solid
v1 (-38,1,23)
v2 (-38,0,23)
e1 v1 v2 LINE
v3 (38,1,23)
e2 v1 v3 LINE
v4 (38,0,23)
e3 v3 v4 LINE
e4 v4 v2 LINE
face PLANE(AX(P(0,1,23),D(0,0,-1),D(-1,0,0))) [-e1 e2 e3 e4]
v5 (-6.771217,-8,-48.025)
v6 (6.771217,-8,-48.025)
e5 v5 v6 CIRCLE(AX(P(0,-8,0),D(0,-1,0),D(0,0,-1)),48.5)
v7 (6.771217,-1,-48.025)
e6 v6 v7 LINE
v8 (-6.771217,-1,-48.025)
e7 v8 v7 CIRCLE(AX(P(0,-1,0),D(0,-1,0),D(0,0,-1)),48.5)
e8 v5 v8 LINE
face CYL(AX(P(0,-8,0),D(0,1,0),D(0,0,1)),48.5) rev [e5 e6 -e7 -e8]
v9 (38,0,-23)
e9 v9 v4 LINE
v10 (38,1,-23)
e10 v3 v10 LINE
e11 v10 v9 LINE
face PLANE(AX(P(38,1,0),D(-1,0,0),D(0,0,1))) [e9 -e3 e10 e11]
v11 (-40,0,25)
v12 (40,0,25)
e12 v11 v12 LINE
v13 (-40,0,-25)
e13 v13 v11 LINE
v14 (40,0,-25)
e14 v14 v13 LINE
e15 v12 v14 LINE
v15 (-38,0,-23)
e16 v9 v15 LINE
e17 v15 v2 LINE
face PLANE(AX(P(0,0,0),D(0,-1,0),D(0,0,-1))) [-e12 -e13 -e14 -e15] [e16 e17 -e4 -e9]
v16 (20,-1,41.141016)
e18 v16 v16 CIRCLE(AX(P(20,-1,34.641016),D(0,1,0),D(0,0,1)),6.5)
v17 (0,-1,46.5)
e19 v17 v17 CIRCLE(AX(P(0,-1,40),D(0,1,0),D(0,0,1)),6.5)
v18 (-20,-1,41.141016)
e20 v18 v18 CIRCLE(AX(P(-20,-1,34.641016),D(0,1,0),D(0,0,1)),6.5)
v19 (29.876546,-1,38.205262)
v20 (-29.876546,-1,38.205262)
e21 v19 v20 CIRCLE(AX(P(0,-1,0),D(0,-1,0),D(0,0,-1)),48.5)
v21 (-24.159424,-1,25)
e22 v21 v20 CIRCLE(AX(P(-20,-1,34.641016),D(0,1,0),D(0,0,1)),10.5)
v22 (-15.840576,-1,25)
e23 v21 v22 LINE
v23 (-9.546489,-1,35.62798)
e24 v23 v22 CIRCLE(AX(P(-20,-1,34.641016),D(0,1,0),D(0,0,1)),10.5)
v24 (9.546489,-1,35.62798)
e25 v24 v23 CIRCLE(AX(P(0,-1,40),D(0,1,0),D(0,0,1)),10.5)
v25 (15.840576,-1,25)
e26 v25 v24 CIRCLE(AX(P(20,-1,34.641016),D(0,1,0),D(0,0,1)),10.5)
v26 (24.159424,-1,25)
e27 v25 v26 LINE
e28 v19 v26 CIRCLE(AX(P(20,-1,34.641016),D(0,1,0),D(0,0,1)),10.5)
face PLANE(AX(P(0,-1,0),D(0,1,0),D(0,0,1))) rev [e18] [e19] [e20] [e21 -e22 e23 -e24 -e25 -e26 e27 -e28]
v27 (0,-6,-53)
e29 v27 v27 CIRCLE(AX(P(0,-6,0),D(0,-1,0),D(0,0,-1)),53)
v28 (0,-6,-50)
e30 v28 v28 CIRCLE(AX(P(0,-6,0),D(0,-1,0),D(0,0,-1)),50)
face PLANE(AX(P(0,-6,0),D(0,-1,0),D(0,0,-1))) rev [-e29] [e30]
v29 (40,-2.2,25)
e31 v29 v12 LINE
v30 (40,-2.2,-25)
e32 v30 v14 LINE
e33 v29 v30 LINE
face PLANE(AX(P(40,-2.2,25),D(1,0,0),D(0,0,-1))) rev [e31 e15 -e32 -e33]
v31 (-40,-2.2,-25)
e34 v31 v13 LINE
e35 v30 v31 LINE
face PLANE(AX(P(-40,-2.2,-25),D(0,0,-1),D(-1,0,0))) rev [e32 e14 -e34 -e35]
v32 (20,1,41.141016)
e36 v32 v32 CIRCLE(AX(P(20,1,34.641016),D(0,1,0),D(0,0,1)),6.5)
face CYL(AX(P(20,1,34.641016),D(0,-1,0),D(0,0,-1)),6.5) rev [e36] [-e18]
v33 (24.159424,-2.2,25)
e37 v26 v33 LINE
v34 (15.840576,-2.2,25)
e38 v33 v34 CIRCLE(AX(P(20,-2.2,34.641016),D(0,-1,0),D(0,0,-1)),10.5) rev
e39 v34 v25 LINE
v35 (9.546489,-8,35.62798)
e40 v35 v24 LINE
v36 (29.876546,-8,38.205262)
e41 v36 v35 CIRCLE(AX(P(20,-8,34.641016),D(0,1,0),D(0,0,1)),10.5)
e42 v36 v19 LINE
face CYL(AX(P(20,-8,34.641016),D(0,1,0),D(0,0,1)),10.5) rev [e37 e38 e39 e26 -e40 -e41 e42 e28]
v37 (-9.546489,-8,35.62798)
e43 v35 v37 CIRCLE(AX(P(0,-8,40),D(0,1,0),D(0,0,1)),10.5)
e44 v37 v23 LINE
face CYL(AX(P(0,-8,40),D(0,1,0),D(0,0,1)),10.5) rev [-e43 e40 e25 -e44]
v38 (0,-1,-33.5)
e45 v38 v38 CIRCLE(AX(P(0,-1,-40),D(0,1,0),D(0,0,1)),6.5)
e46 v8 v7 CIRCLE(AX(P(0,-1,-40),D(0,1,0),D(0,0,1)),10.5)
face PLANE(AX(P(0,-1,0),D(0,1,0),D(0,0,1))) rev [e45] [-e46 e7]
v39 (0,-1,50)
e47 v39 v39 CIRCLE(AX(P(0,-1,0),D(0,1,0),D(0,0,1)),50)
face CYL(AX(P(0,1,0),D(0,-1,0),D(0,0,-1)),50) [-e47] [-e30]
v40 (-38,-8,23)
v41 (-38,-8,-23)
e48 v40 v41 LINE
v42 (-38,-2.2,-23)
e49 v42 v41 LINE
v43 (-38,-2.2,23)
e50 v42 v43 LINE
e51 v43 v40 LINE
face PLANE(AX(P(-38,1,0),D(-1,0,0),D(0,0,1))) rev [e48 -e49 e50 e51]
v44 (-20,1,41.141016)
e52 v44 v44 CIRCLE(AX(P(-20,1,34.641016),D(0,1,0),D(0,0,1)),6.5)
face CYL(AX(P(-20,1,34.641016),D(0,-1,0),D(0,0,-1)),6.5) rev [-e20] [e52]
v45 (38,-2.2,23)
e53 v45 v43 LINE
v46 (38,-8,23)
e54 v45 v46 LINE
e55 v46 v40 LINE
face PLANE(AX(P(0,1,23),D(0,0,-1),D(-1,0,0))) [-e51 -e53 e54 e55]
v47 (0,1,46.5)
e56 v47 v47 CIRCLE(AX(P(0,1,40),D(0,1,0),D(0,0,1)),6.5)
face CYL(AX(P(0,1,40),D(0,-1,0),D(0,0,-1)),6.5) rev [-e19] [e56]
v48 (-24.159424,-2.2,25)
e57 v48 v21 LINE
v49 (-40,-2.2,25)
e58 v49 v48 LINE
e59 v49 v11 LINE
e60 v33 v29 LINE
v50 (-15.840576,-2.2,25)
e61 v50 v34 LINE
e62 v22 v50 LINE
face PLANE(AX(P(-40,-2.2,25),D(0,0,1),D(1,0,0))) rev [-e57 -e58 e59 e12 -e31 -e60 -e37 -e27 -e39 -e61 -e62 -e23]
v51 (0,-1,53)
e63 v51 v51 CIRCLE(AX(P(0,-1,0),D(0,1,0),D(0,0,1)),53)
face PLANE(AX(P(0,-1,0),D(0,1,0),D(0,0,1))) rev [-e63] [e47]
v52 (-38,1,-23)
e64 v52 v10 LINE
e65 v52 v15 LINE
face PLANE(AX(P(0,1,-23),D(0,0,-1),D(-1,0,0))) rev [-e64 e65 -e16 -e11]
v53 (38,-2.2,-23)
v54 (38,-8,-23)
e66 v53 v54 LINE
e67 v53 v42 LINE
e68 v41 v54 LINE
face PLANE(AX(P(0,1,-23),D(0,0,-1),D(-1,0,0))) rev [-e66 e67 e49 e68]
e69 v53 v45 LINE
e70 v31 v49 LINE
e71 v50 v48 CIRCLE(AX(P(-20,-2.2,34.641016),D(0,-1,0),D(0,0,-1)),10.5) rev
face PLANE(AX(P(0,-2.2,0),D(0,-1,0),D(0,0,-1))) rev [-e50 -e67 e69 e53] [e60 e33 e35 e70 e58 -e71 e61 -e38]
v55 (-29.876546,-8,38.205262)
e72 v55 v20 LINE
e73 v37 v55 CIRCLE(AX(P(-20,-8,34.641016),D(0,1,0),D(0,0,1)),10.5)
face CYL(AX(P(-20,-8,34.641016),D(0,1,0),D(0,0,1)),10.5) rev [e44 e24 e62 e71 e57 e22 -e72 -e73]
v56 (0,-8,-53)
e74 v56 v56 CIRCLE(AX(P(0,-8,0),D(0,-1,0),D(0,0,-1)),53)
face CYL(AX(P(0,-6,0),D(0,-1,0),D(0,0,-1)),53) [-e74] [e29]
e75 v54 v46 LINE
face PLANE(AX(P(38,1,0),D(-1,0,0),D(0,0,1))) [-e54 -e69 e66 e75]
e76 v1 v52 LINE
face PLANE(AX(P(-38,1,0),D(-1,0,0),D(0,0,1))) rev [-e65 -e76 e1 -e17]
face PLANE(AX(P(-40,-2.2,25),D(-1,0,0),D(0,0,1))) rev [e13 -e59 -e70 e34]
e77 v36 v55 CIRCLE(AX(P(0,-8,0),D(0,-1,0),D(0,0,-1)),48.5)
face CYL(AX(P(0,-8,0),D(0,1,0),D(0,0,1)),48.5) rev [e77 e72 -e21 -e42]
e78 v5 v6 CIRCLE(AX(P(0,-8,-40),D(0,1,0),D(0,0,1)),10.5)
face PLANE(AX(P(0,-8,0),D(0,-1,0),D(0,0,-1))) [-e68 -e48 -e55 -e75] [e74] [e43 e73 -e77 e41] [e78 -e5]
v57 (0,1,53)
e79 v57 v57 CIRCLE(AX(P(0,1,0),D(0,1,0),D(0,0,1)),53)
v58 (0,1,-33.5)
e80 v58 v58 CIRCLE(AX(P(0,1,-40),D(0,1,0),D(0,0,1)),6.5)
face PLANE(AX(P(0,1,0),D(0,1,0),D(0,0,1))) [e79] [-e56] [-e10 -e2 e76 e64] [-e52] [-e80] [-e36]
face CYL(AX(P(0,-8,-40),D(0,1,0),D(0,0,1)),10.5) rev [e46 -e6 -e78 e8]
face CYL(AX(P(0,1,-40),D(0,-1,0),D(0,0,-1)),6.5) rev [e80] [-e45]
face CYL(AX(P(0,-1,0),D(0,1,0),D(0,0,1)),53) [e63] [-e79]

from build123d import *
from build123d.topology import SkipClean

# Parameters (mm, degrees)
SKETCH1_R           = 50
SKETCH1_R_2         = 6.5
SKETCH1_W           = 76
SKETCH1_H           = 46
BOSS_EXTRUDE1_DEPTH = 1
SKETCH2_R           = 50
SKETCH2_R_2         = 48.5
BOSS_EXTRUDE2_DEPTH = 7
SKETCH3_R           = 53
SKETCH3_R_2         = 50
BOSS_EXTRUDE3_DEPTH = 2
BOSS_EXTRUDE4_START = -7
SKETCH3_2_R         = 53
SKETCH3_2_R_2       = 50
BOSS_EXTRUDE4_DEPTH = 2
SKETCH5_W           = 76
SKETCH5_H           = 46
BOSS_EXTRUDE5_DEPTH = 7
SKETCH4_W           = 80
SKETCH4_H           = 50
CUT_EXTRUDE1_DEPTH  = 2.2


with BuildPart() as part:
    # Sketch1 → Boss-Extrude1 (new, symmetric)
    with BuildSketch(Plane(origin=(0, 0, 0), x_dir=(1, 0, 0), z_dir=(0, 1, 0))):
        with Locations(Location((0, 0, 0), (0, 0, 270))):
            Circle(SKETCH1_R)
        with Locations(Location((0, 40, 0), (0, 0, 270))):
            Circle(SKETCH1_R_2, mode=Mode.SUBTRACT)
        with Locations(Location((0, -40, 0), (0, 0, 270))):
            Circle(SKETCH1_R_2, mode=Mode.SUBTRACT)
        with Locations(Location((20, -34.641016151, 0), (0, 0, 270))):
            Circle(SKETCH1_R_2, mode=Mode.SUBTRACT)
        with Locations(Location((-20, -34.641016151, 0), (0, 0, 270))):
            Circle(SKETCH1_R_2, mode=Mode.SUBTRACT)
        Rectangle(SKETCH1_W, SKETCH1_H, mode=Mode.SUBTRACT)
    extrude(amount=BOSS_EXTRUDE1_DEPTH, both=True)

    # Sketch2 → Boss-Extrude2 (add)
    with SkipClean():  # the faces are left unmerged after this step: merging them gives an invalid solid
        with BuildSketch(Plane.XZ.offset(1)):
            with Locations(Location((0, 0, 0), (0, 0, 270))):
                Circle(SKETCH2_R)
            with Locations(Location((0, 0, 0), (0, 0, 270))):
                Circle(SKETCH2_R_2, mode=Mode.SUBTRACT)
        extrude(amount=BOSS_EXTRUDE2_DEPTH)

    # Sketch3 → Boss-Extrude3 (add)
    with BuildSketch(Plane(origin=(0, 1, 0), x_dir=(1, 0, 0), z_dir=(0, 1, 0))):
        with Locations(Location((0, 0, 0), (0, 0, 270))):
            Circle(SKETCH3_R)
        with Locations(Location((0, 0, 0), (0, 0, 90))):
            Circle(SKETCH3_R_2, mode=Mode.SUBTRACT)
    extrude(amount=-BOSS_EXTRUDE3_DEPTH)

    # Sketch3<2> → Boss-Extrude4 (add)
    with BuildSketch(Plane(origin=(0, 1, 0), x_dir=(1, 0, 0), z_dir=(0, 1, 0)).offset(BOSS_EXTRUDE4_START)):
        with Locations(Location((0, 0, 0), (0, 0, 270))):
            Circle(SKETCH3_2_R)
        with Locations(Location((0, 0, 0), (0, 0, 90))):
            Circle(SKETCH3_2_R_2, mode=Mode.SUBTRACT)
    extrude(amount=-BOSS_EXTRUDE4_DEPTH)

    # Sketch5 → Boss-Extrude5 (add, through all)
    with BuildSketch(Plane.XZ.offset(1)):
        with BuildLine():
            ThreePointArc((29.876545638, 38.205261689), (21.320536736, 24.224386047), (9.54648854, 35.627980267))
            ThreePointArc((9.54648854, 35.627980267), (0, 29.5), (-9.54648854, 35.627980267))
            ThreePointArc((-9.54648854, 35.627980267), (-21.320536736, 24.224386047), (-29.876545638, 38.205261689))
            ThreePointArc((-29.876545638, 38.205261689), (-46.847402575, -12.552723687), (-6.771216656, -48.025))
            ThreePointArc((-6.771216656, -48.025), (0, -29.5), (6.771216656, -48.025))
            ThreePointArc((6.771216656, -48.025), (46.847402575, -12.552723687), (29.876545638, 38.205261689))
        make_face()
        Rectangle(SKETCH5_W, SKETCH5_H, mode=Mode.SUBTRACT)
    extrude(amount=BOSS_EXTRUDE5_DEPTH)

    # Sketch4 → Cut-Extrude1 (cut)
    with BuildSketch(Plane(origin=(0, 0, 0), x_dir=(1, 0, 0), z_dir=(0, 1, 0))):
        Rectangle(SKETCH4_W, SKETCH4_H)
    extrude(amount=-CUT_EXTRUDE1_DEPTH, mode=Mode.SUBTRACT)


solid = part.part
